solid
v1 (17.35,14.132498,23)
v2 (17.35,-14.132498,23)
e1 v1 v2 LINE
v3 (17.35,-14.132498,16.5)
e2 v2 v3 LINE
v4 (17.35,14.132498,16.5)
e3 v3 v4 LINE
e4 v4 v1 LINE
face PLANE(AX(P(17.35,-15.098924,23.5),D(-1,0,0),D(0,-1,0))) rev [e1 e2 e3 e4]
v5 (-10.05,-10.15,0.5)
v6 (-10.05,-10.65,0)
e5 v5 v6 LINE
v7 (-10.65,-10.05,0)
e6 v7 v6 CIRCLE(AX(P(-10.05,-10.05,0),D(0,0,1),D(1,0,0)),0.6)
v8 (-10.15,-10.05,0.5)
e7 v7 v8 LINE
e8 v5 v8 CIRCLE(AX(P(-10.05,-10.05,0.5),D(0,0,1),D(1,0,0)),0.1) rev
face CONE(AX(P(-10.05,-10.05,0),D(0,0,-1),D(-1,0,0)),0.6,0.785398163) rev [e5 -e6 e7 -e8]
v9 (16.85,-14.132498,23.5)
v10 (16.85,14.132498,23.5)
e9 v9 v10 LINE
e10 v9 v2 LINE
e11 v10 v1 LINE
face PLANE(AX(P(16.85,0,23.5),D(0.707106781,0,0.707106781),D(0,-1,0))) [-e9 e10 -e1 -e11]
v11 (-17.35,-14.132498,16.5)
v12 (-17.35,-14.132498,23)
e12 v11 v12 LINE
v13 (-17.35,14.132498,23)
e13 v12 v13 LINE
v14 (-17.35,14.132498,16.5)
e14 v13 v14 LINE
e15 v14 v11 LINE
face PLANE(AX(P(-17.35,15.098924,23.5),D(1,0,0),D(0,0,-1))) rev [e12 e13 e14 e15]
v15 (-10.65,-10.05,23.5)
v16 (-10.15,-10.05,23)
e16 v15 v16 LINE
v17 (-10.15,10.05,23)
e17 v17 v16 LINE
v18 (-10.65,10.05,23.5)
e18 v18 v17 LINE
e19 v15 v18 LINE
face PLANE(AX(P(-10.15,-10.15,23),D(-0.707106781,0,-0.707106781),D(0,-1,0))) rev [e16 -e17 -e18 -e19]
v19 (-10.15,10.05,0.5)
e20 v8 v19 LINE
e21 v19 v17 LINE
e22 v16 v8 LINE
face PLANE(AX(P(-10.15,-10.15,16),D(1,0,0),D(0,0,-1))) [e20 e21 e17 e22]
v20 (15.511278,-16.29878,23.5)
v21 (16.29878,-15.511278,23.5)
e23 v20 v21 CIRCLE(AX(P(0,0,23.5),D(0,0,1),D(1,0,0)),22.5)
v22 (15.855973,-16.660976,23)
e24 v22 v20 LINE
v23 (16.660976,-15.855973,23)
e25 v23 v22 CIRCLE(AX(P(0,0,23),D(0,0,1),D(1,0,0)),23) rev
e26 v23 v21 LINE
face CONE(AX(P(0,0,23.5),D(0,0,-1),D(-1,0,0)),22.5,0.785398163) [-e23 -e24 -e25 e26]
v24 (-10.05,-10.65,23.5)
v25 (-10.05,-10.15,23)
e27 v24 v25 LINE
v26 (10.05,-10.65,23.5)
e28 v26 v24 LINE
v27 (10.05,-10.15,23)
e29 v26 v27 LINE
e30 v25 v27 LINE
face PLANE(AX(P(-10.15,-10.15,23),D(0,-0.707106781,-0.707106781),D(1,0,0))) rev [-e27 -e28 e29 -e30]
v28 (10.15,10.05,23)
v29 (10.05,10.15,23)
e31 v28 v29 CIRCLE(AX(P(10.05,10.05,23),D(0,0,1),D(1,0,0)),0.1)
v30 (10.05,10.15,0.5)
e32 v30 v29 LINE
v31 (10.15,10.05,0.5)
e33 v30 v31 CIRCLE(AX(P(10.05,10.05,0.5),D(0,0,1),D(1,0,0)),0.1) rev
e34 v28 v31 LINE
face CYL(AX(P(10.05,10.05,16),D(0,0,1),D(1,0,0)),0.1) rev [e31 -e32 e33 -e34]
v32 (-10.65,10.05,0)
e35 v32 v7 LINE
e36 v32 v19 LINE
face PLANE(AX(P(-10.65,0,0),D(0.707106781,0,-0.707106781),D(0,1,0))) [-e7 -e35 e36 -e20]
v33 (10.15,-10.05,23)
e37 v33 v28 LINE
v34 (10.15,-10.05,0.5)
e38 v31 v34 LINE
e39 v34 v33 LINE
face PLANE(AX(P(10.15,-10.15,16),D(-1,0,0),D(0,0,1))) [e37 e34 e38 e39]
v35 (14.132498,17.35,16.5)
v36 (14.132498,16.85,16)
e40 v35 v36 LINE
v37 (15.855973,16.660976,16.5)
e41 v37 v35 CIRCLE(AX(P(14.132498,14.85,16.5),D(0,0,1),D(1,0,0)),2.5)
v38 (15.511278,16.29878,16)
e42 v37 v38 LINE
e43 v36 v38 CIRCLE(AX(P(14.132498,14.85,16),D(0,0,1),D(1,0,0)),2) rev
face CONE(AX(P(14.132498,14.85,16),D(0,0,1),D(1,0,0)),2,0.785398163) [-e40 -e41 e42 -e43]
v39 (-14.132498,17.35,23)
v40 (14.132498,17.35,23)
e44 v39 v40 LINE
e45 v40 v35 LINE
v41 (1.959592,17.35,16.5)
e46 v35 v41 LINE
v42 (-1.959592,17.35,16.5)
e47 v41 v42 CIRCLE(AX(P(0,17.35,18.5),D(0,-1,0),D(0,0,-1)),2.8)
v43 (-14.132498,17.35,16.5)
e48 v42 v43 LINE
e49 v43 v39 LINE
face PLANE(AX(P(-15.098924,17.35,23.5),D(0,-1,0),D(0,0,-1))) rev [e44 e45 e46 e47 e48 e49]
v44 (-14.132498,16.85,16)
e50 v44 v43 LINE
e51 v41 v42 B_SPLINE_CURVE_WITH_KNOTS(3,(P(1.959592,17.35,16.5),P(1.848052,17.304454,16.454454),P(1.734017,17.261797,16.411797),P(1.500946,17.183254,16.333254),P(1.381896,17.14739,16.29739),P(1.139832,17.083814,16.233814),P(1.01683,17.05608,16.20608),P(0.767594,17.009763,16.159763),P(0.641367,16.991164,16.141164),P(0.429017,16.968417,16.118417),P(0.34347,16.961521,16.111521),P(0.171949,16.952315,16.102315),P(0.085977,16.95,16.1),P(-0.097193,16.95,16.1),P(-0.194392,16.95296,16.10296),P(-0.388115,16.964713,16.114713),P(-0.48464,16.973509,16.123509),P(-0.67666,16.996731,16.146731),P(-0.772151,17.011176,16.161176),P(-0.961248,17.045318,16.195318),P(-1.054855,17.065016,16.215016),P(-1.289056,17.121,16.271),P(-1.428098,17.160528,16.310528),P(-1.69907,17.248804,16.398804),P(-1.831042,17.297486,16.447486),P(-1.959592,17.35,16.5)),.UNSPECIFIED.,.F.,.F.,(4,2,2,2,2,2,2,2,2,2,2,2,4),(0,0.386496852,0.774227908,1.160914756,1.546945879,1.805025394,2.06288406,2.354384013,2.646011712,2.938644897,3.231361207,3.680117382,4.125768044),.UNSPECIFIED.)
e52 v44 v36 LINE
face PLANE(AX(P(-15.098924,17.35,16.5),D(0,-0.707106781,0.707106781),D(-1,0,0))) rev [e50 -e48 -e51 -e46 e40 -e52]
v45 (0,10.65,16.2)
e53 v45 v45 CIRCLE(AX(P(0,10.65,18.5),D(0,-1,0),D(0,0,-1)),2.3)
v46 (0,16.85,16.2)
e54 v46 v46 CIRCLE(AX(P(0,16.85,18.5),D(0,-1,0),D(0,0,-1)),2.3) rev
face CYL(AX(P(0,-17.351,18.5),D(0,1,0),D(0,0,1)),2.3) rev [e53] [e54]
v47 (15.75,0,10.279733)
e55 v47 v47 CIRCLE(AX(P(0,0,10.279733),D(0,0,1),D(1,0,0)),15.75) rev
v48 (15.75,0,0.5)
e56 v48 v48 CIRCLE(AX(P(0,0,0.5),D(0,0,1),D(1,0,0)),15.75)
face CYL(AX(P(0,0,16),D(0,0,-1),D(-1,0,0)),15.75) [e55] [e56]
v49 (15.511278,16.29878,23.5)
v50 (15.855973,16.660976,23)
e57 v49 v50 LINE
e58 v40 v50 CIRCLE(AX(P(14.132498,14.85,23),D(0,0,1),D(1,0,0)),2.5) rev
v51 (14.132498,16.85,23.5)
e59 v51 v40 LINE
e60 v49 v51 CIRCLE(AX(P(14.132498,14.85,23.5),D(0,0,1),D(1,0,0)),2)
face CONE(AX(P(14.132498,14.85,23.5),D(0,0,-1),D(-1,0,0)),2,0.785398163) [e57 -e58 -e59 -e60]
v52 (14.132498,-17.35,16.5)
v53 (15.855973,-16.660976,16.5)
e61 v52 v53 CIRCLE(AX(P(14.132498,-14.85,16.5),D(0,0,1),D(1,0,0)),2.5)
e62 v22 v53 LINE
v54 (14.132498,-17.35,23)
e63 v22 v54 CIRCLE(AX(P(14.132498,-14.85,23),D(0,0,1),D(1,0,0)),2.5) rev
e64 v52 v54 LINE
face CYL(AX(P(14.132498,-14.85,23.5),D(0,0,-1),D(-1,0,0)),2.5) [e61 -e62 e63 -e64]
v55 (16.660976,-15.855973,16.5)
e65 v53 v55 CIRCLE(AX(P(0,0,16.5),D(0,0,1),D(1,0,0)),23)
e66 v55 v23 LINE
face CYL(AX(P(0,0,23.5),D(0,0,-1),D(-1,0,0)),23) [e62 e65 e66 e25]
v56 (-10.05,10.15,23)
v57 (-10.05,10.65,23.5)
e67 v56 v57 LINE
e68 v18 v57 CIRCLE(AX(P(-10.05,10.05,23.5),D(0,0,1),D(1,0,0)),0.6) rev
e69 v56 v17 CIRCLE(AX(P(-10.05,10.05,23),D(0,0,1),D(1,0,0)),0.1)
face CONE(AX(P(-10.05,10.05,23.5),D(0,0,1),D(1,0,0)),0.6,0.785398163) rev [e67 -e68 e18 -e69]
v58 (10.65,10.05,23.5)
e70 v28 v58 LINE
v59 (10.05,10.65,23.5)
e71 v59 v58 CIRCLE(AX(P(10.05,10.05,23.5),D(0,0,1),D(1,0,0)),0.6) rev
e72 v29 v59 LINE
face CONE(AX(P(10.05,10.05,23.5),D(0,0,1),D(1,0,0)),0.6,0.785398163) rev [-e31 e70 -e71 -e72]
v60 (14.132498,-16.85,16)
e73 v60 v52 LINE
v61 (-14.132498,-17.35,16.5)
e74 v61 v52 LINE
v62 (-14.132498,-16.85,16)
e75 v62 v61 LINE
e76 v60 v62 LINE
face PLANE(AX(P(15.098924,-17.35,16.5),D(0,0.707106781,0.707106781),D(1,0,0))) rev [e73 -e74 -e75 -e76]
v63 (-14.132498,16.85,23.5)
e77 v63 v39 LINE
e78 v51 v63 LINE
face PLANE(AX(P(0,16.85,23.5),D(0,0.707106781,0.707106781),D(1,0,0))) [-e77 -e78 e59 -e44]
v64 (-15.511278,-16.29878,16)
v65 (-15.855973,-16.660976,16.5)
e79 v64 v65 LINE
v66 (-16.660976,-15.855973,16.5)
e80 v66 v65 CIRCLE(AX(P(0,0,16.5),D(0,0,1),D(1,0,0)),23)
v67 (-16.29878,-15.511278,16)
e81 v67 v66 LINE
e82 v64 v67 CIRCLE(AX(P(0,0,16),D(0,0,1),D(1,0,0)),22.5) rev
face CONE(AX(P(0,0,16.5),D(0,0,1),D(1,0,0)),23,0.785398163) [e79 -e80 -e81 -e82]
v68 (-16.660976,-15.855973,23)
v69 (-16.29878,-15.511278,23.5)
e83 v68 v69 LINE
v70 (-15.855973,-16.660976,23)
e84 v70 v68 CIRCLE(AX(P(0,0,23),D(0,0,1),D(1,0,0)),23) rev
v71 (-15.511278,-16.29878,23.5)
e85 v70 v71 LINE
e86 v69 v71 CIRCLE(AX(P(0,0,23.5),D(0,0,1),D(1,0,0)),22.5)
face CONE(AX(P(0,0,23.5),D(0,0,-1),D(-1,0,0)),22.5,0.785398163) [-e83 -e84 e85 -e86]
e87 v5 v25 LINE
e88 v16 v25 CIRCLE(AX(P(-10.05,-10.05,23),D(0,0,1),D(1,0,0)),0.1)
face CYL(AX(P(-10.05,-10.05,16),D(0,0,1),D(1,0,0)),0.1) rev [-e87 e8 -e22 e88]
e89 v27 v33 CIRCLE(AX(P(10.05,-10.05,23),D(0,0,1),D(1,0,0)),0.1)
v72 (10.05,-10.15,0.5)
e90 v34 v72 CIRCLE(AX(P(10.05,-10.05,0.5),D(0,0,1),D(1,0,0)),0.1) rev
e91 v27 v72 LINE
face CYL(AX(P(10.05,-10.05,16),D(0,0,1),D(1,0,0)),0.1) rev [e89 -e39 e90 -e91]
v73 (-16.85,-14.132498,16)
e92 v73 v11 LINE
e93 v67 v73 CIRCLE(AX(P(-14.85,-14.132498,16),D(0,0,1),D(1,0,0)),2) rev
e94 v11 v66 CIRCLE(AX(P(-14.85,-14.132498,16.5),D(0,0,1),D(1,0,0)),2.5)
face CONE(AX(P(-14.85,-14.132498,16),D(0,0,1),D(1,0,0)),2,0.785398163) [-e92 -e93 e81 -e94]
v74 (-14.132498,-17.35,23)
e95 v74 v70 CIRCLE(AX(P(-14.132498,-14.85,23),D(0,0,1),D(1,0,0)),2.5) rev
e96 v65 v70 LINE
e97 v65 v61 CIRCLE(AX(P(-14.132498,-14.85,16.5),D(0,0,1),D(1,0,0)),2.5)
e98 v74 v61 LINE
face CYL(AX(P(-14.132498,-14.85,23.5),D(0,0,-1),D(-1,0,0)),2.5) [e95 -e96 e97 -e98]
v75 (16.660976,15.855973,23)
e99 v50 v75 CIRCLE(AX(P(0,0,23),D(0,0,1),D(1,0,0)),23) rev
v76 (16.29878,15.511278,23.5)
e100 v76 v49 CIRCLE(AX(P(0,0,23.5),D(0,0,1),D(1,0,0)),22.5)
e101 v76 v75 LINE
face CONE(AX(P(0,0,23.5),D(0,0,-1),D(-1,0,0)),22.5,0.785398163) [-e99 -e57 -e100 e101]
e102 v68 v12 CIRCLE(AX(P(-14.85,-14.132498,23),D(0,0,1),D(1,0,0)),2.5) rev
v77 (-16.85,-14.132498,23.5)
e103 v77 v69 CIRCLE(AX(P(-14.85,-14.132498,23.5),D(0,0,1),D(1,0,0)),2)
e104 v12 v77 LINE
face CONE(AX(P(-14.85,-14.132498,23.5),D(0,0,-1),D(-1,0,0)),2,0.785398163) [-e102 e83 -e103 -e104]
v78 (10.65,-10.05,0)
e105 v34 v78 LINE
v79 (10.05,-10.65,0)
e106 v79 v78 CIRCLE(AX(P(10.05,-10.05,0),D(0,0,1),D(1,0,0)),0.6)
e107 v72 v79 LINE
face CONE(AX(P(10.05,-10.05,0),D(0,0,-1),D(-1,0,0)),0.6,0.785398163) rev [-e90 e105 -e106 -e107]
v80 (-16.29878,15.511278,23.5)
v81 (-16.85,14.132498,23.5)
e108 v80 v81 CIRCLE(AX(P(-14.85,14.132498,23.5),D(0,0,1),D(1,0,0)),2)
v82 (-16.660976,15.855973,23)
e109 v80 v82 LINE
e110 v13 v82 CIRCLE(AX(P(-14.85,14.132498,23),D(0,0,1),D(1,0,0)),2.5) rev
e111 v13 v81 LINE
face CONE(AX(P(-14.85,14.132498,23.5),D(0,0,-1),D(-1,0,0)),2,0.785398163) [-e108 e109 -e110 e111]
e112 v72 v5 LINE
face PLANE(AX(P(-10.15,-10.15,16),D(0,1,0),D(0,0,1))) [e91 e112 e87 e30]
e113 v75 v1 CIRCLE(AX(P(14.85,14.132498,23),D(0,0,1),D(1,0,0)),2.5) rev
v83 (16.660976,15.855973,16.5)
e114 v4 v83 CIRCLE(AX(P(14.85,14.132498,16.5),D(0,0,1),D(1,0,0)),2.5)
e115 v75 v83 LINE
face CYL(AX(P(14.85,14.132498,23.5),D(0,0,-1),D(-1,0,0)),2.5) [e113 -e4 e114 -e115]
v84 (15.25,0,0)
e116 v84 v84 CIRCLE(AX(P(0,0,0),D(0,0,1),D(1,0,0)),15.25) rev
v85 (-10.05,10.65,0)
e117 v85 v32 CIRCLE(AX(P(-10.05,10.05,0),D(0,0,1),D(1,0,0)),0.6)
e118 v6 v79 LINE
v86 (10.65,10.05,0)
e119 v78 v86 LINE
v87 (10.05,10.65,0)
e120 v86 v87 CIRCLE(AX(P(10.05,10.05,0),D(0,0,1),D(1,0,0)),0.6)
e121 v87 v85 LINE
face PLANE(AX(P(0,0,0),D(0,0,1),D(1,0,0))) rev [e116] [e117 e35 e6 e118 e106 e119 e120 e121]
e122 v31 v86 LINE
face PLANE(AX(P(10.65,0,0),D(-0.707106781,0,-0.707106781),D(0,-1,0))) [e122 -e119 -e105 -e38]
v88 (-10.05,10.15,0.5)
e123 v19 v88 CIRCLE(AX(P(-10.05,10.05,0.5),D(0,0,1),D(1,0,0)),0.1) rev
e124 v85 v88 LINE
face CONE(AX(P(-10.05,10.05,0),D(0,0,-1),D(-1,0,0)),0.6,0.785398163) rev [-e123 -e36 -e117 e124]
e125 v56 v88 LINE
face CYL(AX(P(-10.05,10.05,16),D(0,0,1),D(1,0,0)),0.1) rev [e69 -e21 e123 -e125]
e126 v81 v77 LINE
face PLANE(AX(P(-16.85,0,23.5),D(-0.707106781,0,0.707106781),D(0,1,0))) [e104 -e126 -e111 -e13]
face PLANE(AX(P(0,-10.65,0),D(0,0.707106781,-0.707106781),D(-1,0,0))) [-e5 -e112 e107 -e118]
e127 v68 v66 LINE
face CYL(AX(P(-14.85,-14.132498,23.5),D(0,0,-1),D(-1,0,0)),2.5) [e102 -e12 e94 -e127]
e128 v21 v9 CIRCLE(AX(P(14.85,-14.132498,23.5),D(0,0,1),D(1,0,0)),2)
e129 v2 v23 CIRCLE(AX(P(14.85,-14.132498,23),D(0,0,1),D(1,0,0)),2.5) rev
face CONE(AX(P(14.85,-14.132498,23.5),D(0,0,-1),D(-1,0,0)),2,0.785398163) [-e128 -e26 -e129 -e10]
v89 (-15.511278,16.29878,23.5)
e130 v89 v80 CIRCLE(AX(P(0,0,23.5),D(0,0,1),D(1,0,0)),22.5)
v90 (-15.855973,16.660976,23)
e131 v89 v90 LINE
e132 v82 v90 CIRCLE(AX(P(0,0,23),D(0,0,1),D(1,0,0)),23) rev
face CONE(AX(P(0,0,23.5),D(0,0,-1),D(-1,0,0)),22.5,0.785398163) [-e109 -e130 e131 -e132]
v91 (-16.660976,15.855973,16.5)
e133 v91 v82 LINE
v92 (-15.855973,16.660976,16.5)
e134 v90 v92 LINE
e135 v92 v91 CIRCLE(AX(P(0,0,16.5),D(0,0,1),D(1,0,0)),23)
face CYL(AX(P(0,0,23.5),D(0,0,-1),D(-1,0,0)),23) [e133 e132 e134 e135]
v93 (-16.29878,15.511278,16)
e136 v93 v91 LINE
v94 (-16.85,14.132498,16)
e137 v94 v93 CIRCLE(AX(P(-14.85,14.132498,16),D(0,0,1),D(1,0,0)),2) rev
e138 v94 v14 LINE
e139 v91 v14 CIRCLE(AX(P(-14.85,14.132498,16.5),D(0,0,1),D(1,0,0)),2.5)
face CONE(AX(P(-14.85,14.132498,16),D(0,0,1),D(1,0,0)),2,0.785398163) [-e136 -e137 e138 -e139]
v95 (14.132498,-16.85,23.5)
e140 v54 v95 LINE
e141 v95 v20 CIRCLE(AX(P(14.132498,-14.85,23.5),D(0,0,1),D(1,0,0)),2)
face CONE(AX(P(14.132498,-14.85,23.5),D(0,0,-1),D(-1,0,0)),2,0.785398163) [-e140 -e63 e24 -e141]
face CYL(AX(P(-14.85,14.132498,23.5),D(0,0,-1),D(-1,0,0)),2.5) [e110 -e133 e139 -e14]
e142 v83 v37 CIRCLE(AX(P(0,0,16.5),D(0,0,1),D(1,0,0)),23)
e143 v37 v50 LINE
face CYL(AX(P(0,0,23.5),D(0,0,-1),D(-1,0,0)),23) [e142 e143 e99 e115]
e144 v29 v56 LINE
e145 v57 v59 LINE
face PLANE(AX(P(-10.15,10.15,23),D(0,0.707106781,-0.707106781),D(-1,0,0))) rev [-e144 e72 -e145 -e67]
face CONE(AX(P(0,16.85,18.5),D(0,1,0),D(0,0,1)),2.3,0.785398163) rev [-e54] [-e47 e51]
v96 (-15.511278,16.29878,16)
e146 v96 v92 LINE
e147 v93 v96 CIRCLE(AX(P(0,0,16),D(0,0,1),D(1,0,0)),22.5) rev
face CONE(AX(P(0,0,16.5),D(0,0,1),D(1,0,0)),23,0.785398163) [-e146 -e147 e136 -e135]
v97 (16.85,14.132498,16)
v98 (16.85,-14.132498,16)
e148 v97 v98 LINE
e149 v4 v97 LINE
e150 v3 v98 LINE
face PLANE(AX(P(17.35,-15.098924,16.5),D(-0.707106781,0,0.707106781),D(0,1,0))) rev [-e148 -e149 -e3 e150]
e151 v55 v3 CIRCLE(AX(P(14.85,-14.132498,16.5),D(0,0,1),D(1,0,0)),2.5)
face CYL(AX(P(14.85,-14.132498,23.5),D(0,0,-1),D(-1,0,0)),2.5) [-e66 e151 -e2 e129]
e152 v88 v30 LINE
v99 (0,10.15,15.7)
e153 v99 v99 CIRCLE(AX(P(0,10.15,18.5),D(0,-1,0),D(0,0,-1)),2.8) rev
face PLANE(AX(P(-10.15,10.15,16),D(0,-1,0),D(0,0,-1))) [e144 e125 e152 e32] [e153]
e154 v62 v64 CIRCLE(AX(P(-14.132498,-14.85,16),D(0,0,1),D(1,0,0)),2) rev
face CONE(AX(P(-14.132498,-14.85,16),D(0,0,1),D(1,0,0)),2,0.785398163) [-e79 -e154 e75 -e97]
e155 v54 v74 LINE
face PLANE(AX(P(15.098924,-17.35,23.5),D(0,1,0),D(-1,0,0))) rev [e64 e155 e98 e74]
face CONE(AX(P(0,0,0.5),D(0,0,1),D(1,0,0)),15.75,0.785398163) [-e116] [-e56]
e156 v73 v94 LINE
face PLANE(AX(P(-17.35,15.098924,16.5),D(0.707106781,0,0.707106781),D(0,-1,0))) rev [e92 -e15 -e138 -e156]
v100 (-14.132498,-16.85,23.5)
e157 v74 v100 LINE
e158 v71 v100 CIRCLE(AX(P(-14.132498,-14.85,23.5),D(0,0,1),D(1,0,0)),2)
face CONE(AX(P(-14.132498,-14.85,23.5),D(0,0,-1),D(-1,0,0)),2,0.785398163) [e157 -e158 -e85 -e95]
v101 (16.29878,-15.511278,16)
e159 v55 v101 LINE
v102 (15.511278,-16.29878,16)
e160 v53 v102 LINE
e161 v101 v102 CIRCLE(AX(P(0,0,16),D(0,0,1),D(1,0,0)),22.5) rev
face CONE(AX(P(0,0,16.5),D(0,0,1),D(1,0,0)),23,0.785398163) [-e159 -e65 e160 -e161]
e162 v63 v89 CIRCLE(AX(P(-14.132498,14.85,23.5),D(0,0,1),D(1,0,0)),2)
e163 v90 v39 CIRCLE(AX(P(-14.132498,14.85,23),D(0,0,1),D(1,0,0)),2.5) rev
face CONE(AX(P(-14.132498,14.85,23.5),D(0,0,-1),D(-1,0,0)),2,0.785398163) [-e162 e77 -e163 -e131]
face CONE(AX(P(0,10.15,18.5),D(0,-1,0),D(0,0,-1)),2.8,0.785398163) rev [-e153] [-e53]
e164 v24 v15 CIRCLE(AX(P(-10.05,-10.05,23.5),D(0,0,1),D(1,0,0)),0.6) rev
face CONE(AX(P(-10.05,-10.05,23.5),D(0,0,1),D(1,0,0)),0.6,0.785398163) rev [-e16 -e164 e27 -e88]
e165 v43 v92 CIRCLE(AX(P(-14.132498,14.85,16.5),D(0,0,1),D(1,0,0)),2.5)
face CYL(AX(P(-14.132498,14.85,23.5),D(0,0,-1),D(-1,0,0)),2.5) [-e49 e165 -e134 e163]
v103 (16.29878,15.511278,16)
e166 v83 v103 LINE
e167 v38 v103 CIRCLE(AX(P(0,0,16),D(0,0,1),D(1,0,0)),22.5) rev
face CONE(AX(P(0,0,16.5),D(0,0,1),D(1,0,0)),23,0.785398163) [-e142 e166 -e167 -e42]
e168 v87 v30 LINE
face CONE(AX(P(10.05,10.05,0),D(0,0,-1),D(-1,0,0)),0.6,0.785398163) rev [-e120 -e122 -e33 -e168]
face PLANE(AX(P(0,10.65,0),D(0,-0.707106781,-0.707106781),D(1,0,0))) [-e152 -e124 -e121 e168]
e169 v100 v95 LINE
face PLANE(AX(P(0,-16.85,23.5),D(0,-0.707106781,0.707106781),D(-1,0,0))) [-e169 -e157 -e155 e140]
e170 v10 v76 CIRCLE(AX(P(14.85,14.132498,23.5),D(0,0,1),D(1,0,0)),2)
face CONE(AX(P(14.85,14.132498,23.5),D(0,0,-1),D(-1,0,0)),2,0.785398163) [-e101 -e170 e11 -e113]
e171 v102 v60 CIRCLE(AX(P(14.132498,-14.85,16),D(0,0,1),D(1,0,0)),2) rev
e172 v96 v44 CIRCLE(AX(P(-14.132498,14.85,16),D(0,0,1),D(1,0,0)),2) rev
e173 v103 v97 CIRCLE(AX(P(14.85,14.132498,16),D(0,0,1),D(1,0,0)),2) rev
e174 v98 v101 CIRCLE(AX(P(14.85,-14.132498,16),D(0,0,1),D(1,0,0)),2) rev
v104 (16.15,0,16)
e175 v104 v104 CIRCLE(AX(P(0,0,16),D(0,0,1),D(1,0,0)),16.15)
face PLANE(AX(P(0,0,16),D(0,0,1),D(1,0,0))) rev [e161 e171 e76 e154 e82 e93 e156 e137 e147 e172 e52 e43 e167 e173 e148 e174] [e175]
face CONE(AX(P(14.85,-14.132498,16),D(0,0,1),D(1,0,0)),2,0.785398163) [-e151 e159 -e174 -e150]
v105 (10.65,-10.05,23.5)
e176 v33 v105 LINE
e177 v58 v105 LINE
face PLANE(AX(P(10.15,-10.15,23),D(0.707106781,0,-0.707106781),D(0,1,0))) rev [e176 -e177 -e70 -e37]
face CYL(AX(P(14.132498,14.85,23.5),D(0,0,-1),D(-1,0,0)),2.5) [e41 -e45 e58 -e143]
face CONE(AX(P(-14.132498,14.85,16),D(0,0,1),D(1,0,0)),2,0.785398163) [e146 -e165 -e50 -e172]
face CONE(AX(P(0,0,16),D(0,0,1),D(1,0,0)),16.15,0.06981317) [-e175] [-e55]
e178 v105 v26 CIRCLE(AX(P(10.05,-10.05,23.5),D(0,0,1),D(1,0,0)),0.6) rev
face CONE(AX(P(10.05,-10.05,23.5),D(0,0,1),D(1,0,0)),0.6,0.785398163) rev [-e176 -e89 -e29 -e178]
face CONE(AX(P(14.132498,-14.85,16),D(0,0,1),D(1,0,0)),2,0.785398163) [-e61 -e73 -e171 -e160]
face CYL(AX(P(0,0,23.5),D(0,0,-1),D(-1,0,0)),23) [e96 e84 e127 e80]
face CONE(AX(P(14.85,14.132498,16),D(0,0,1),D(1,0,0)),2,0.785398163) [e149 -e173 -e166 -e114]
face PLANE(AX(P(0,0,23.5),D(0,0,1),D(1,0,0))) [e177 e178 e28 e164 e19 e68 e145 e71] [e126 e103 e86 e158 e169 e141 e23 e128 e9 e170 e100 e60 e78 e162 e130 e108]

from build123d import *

# Parameters (mm, degrees)
SKIZZE1_R                       = 15.75
SKIZZE1_W                       = 20.3
SKIZZE1_H                       = 20.3
AUFSATZ_LINEAR_AUSTRAGEN1_DEPTH = 16
SKIZZE2_W                       = 20.3
SKIZZE2_H                       = 20.3
AUFSATZ_LINEAR_AUSTRAGEN2_DEPTH = 7.5
SCHNITT_LINEAR_AUSTRAGEN1_REACH = 47.358
SKIZZE3_R                       = 2.3
CHAMFER1_SIZE                   = 0.4
CHAMFER1_SIZE2                  = 5.720266503
VERRUNDUNG1_R                   = 0.1
VERRUNDUNG2_R                   = 2.5
FASE1_SIZE                      = 0.5
FASE4_SIZE                      = 0.5


with BuildPart() as part:
    # Skizze1 → Aufsatz-Linear austragen1 (new body)
    with BuildSketch(Plane.XY):
        Circle(SKIZZE1_R)
        Rectangle(SKIZZE1_W, SKIZZE1_H, mode=Mode.SUBTRACT)
    extrude(amount=AUFSATZ_LINEAR_AUSTRAGEN1_DEPTH)

    # Skizze2 → Aufsatz-Linear austragen2 (add)
    with BuildSketch(Plane.XY.offset(16)):
        with BuildLine():
            Line((-15.098923803, 17.35), (15.098923803, 17.35))
            ThreePointArc((15.098923803, 17.35), (16.263455967, 16.263455967), (17.35, 15.098923803))
            Line((17.35, 15.098923803), (17.35, -15.098923803))
            ThreePointArc((17.35, -15.098923803), (16.263455967, -16.263455967), (15.098923803, -17.35))
            Line((15.098923803, -17.35), (-15.098923803, -17.35))
            ThreePointArc((-15.098923803, -17.35), (-16.263455967, -16.263455967), (-17.35, -15.098923803))
            Line((-17.35, -15.098923803), (-17.35, 15.098923803))
            ThreePointArc((-17.35, 15.098923803), (-16.263455967, 16.263455967), (-15.098923803, 17.35))
        make_face()
        Rectangle(SKIZZE2_W, SKIZZE2_H, mode=Mode.SUBTRACT)
    extrude(amount=AUFSATZ_LINEAR_AUSTRAGEN2_DEPTH)

    # Skizze3 → Schnitt-Linear austragen1 (cut, up to next)
    with BuildSketch(Plane(origin=(0, 17.35, 0), x_dir=(1, 0, 0), z_dir=(0, 1, 0)), mode=Mode.PRIVATE) as schnitt_linear_austragen1_sk1:
        with Locations(Location((0, -18.5, 0), (0, 0, 270))):
            Circle(SKIZZE3_R)
    schnitt_linear_austragen1_tool1 = extrude(schnitt_linear_austragen1_sk1.sketch, amount=-SCHNITT_LINEAR_AUSTRAGEN1_REACH, mode=Mode.PRIVATE) & part.part
    add(schnitt_linear_austragen1_tool1.solids().sort_by_distance((0, 17.35, 18.5))[0], mode=Mode.SUBTRACT)

    # Chamfer1
    chamfer1_edges = [part.edges().sort_by_distance(p)[0] for p in [
        (-15.75, 0, 16),
    ]]
    chamfer1_side = [part.faces().sort_by_distance(p)[0] for p in [
        (-15.916455967, 15.916455967, 16),
    ]]
    chamfer(chamfer1_edges, length=CHAMFER1_SIZE, length2=CHAMFER1_SIZE2, reference=chamfer1_side[0])

    # Verrundung1
    verrundung1_edges = [part.edges().sort_by_distance(p)[0] for p in [
        (10.15, -10.15, 11.75),
        (10.15, 10.15, 11.75),
        (-10.15, 10.15, 11.75),
        (-10.15, -10.15, 11.75),
    ]]
    fillet(verrundung1_edges, radius=VERRUNDUNG1_R)

    # Verrundung2
    verrundung2_edges = [part.edges().sort_by_distance(p)[0] for p in [
        (-15.098923803, 17.35, 19.75),
        (-17.35, 15.098923803, 19.75),
        (-17.35, -15.098923803, 19.75),
        (-15.098923803, -17.35, 19.75),
        (15.098923803, -17.35, 19.75),
        (17.35, -15.098923803, 19.75),
        (17.35, 15.098923803, 19.75),
        (15.098923803, 17.35, 19.75),
    ]]
    fillet(verrundung2_edges, radius=VERRUNDUNG2_R)

    # Fase1
    # the kernel refuses this chamfer: 0.5 mm, written as the material it takes off along each edge
    with BuildSketch(Plane(origin=(-17.35, -14.13249801, 23.5), x_dir=(0.9996219169112968, 0, 0.027495876610589005), z_dir=(0, 1, 0)), Plane(origin=(14.13249801, -17.35, 23.5), x_dir=(0, 0.9996219169112968, 0.027495876610589005), z_dir=(-1, 0, 0)), Plane(origin=(17.35, 14.13249801, 23.5), x_dir=(-0.9996219169112968, 0, 0.027495876610589005), z_dir=(0, -1, 0)), Plane(origin=(-14.13249801, 17.35, 23.5), x_dir=(0, -0.9996219169112968, 0.027495876610589005), z_dir=(1, 0, 0))) as fase1_piece_1:
        Polygon((FASE1_SIZE * 0.999621916911, FASE1_SIZE * 0.0274958766106), (-FASE1_SIZE * 0.0274958766106, FASE1_SIZE * 0.999621916911), (0, 0), align=None)
    extrude(amount=28.26499602, mode=Mode.SUBTRACT)
    with BuildSketch(Plane(origin=(0, 0, 23.5), x_dir=(-0.7243902439024396, 0.6893901468246876, 0), z_dir=(-0.6893901468246876, -0.7243902439024396, 0))) as fase1_piece_2:
        Polygon((23 - FASE1_SIZE, 0), (23, FASE1_SIZE), (23, 0), align=None)
    revolve(axis=Axis((0, 0, 23.5), (0, 0, -1)), revolution_arc=2.836293852, mode=Mode.SUBTRACT)
    with BuildSketch(Plane(origin=(0, 0, 23.5), x_dir=(0.7243902439024391, -0.6893901468246878, 0), z_dir=(0.6893901468246878, 0.7243902439024391, 0))) as fase1_piece_3:
        Polygon((23 - FASE1_SIZE, 0), (23, FASE1_SIZE), (23, 0), align=None)
    revolve(axis=Axis((0, 0, 23.5), (0, 0, -1)), revolution_arc=2.836293852, mode=Mode.SUBTRACT)
    with BuildSketch(Plane(origin=(0, 0, 23.5), x_dir=(0.689390146824687, 0.7243902439024399, 0), z_dir=(-0.7243902439024399, 0.689390146824687, 0))) as fase1_piece_4:
        Polygon((23 - FASE1_SIZE, 0), (23, FASE1_SIZE), (23, 0), align=None)
    revolve(axis=Axis((0, 0, 23.5), (0, 0, -1)), revolution_arc=2.836293852, mode=Mode.SUBTRACT)
    with BuildSketch(Plane(origin=(-14.13249801, 14.85, 23.5), x_dir=(-0.689390146824687, 0.72439024390244, 0), z_dir=(-0.72439024390244, -0.689390146824687, 0))) as fase1_piece_5:
        Polygon((2.5 - FASE1_SIZE, 0), (2.5, FASE1_SIZE), (2.5, 0), align=None)
    revolve(axis=Axis((-14.13249801, 14.85, 23.5), (0, 0, -1)), revolution_arc=43.581853074, mode=Mode.SUBTRACT)
    with BuildSketch(Plane(origin=(-14.85, 14.13249801, 23.5), x_dir=(-0.7243902439024396, 0.6893901468246874, 0), z_dir=(0.6893901468246874, 0.7243902439024396, 0))) as fase1_piece_6:
        Polygon((2.5 - FASE1_SIZE, 0), (2.5, -FASE1_SIZE), (2.5, 0), align=None)
    revolve(axis=Axis((-14.85, 14.13249801, 23.5), (0, 0, 1)), revolution_arc=43.581853074, mode=Mode.SUBTRACT)
    with BuildSketch(Plane(origin=(14.13249801, 14.85, 23.5), x_dir=(0, 1, 0), z_dir=(-1, 0, 0))) as fase1_piece_7:
        Polygon((2.5 - FASE1_SIZE, 0), (2.5, FASE1_SIZE), (2.5, 0), align=None)
    revolve(axis=Axis((14.13249801, 14.85, 23.5), (0, 0, -1)), revolution_arc=43.581853074, mode=Mode.SUBTRACT)
    with BuildSketch(Plane(origin=(14.85, 14.13249801, 23.5), x_dir=(0.72439024390244, 0.689390146824687, 0), z_dir=(-0.689390146824687, 0.72439024390244, 0))) as fase1_piece_8:
        Polygon((2.5 - FASE1_SIZE, 0), (2.5, FASE1_SIZE), (2.5, 0), align=None)
    revolve(axis=Axis((14.85, 14.13249801, 23.5), (0, 0, -1)), revolution_arc=43.581853074, mode=Mode.SUBTRACT)
    with BuildSketch(Plane(origin=(14.85, -14.13249801, 23.5), x_dir=(1, 0, 0), z_dir=(0, 1, 0))) as fase1_piece_9:
        Polygon((2.5 - FASE1_SIZE, 0), (2.5, FASE1_SIZE), (2.5, 0), align=None)
    revolve(axis=Axis((14.85, -14.13249801, 23.5), (0, 0, -1)), revolution_arc=43.581853074, mode=Mode.SUBTRACT)
    with BuildSketch(Plane(origin=(14.13249801, -14.85, 23.5), x_dir=(0.6893901468246885, -0.7243902439024386, 0), z_dir=(0.7243902439024386, 0.6893901468246885, 0))) as fase1_piece_10:
        Polygon((2.5 - FASE1_SIZE, 0), (2.5, FASE1_SIZE), (2.5, 0), align=None)
    revolve(axis=Axis((14.13249801, -14.85, 23.5), (0, 0, -1)), revolution_arc=43.581853074, mode=Mode.SUBTRACT)
    with BuildSketch(Plane(origin=(-14.13249801, -14.85, 23.5), x_dir=(0, -1, 0), z_dir=(1, 0, 0))) as fase1_piece_11:
        Polygon((2.5 - FASE1_SIZE, 0), (2.5, FASE1_SIZE), (2.5, 0), align=None)
    revolve(axis=Axis((-14.13249801, -14.85, 23.5), (0, 0, -1)), revolution_arc=43.581853074, mode=Mode.SUBTRACT)
    with BuildSketch(Plane(origin=(-14.85, -14.13249801, 23.5), x_dir=(-0.7243902439024386, -0.6893901468246885, 0), z_dir=(0.6893901468246885, -0.7243902439024386, 0))) as fase1_piece_12:
        Polygon((2.5 - FASE1_SIZE, 0), (2.5, FASE1_SIZE), (2.5, 0), align=None)
    revolve(axis=Axis((-14.85, -14.13249801, 23.5), (0, 0, -1)), revolution_arc=43.581853074, mode=Mode.SUBTRACT)
    with BuildSketch(Plane(origin=(0, 0, 0), x_dir=(1, 0, 0), z_dir=(0, -1, 0))) as fase1_piece_13:
        Polygon((15.75 - FASE1_SIZE, 0), (15.75, FASE1_SIZE), (15.75, 0), align=None)
    revolve(axis=Axis((0, 0, 0), (0, 0, 1)), mode=Mode.SUBTRACT)
    with BuildSketch(Plane(origin=(0, 10.15, 18.5), x_dir=(0, 0, 1), z_dir=(-1, 0, 0))) as fase1_piece_14:
        Polygon((2.3 + FASE1_SIZE, 0), (2.3, FASE1_SIZE), (2.3, 0), align=None)
    revolve(axis=Axis((0, 10.15, 18.5), (0, 1, 0)), mode=Mode.SUBTRACT)
    with BuildSketch(Plane(origin=(0, 17.35, 18.5), x_dir=(0, 0, 1), z_dir=(-1, 0, 0))) as fase1_piece_15:
        Polygon((2.3 + FASE1_SIZE, 0), (2.3, -FASE1_SIZE), (2.3, 0), align=None)
    revolve(axis=Axis((0, 17.35, 18.5), (0, 1, 0)), mode=Mode.SUBTRACT)
    with BuildSketch(Plane(origin=(-10.05, -10.15, 0), x_dir=(0, 0.02749587661058563, 0.9996219169112968), z_dir=(1, 0, 0)), Plane(origin=(-10.05, -10.15, 23.5), x_dir=(0, -0.9996219169112968, 0.0274958766105891), z_dir=(1, 0, 0)), Plane(origin=(10.15, -10.05, 0), x_dir=(-0.02749587661058563, 0, 0.9996219169112968), z_dir=(0, 1, 0)), Plane(origin=(10.15, -10.05, 23.5), x_dir=(0.9996219169112968, 0, 0.0274958766105891), z_dir=(0, 1, 0)), Plane(origin=(-10.15, 10.05, 0), x_dir=(0.02749587661058563, 0, 0.9996219169112968), z_dir=(0, -1, 0)), Plane(origin=(-10.15, 10.05, 23.5), x_dir=(-0.9996219169112968, 0, 0.0274958766105891), z_dir=(0, -1, 0)), Plane(origin=(10.05, 10.15, 0), x_dir=(0, -0.02749587661058563, 0.9996219169112968), z_dir=(-1, 0, 0)), Plane(origin=(10.05, 10.15, 23.5), x_dir=(0, 0.9996219169112968, 0.0274958766105891), z_dir=(-1, 0, 0))) as fase1_piece_16:
        Polygon((FASE1_SIZE * 0.999621916911, FASE1_SIZE * 0.0274958766106), (-FASE1_SIZE * 0.0274958766106, FASE1_SIZE * 0.999621916911), (0, 0), align=None)
    extrude(amount=20.1, mode=Mode.SUBTRACT)
    with BuildSketch(Plane(origin=(10.05, -10.05, 0), x_dir=(1, 0, 0), z_dir=(0, 1, 0))) as fase1_piece_17:
        Polygon((0.1, -FASE1_SIZE), (0.1 + FASE1_SIZE, 0), (0.1, 0), align=None)
    revolve(axis=Axis((10.05, -10.05, 0), (0, 0, -1)), revolution_arc=90, mode=Mode.SUBTRACT)
    with BuildSketch(Plane(origin=(10.05, -10.05, 23.5), x_dir=(1, 0, 0), z_dir=(0, 1, 0))) as fase1_piece_18:
        Polygon((0.1 + FASE1_SIZE, 0), (0.1, FASE1_SIZE), (0.1, 0), align=None)
    revolve(axis=Axis((10.05, -10.05, 23.5), (0, 0, -1)), revolution_arc=90, mode=Mode.SUBTRACT)
    with BuildSketch(Plane(origin=(-10.05, -10.05, 0), x_dir=(-1, 0, 0), z_dir=(0, 1, 0))) as fase1_piece_19:
        Polygon((0.1, FASE1_SIZE), (0.1 + FASE1_SIZE, 0), (0.1, 0), align=None)
    revolve(axis=Axis((-10.05, -10.05, 0), (0, 0, 1)), revolution_arc=90, mode=Mode.SUBTRACT)
    with BuildSketch(Plane(origin=(-10.05, -10.05, 23.5), x_dir=(-1, 0, 0), z_dir=(0, 1, 0))) as fase1_piece_20:
        Polygon((0.1 + FASE1_SIZE, 0), (0.1, -FASE1_SIZE), (0.1, 0), align=None)
    revolve(axis=Axis((-10.05, -10.05, 23.5), (0, 0, 1)), revolution_arc=90, mode=Mode.SUBTRACT)
    with BuildSketch(Plane(origin=(-10.05, 10.05, 0), x_dir=(-1, 0, 0), z_dir=(0, -1, 0))) as fase1_piece_21:
        Polygon((0.1, -FASE1_SIZE), (0.1 + FASE1_SIZE, 0), (0.1, 0), align=None)
    revolve(axis=Axis((-10.05, 10.05, 0), (0, 0, -1)), revolution_arc=90, mode=Mode.SUBTRACT)
    with BuildSketch(Plane(origin=(-10.05, 10.05, 23.5), x_dir=(-1, 0, 0), z_dir=(0, -1, 0))) as fase1_piece_22:
        Polygon((0.1 + FASE1_SIZE, 0), (0.1, FASE1_SIZE), (0.1, 0), align=None)
    revolve(axis=Axis((-10.05, 10.05, 23.5), (0, 0, -1)), revolution_arc=90, mode=Mode.SUBTRACT)
    with BuildSketch(Plane(origin=(10.05, 10.05, 0), x_dir=(0, 1, 0), z_dir=(-1, 0, 0))) as fase1_piece_23:
        Polygon((0.1, -FASE1_SIZE), (0.1 + FASE1_SIZE, 0), (0.1, 0), align=None)
    revolve(axis=Axis((10.05, 10.05, 0), (0, 0, -1)), revolution_arc=90, mode=Mode.SUBTRACT)
    with BuildSketch(Plane(origin=(10.05, 10.05, 23.5), x_dir=(0, 1, 0), z_dir=(-1, 0, 0))) as fase1_piece_24:
        Polygon((0.1 + FASE1_SIZE, 0), (0.1, FASE1_SIZE), (0.1, 0), align=None)
    revolve(axis=Axis((10.05, 10.05, 23.5), (0, 0, -1)), revolution_arc=90, mode=Mode.SUBTRACT)
    with BuildSketch(Plane(origin=(0, 0, 23.5), x_dir=(-0.6893901468246829, -0.7243902439024439, 0), z_dir=(0.7243902439024439, -0.6893901468246829, 0))) as fase1_piece_25:
        Polygon((23 - FASE1_SIZE, 0), (23, FASE1_SIZE), (23, 0), align=None)
    revolve(axis=Axis((0, 0, 23.5), (0, 0, -1)), revolution_arc=2.836293852, mode=Mode.SUBTRACT)

    # Fase4
    # the kernel refuses this chamfer: 0.5 mm, written as the material it takes off along each edge
    with BuildSketch(Plane(origin=(14.13249801, -17.35, 16), x_dir=(0, -0.027495876610589005, 0.9996219169112968), z_dir=(-1, 0, 0)), Plane(origin=(17.35, 14.13249801, 16), x_dir=(0.027495876610589005, 0, 0.9996219169112968), z_dir=(0, -1, 0)), Plane(origin=(-17.35, -14.13249801, 16), x_dir=(-0.027495876610589005, 0, 0.9996219169112968), z_dir=(0, 1, 0))) as fase4_piece_1:
        Polygon((FASE4_SIZE * 0.999621916911, FASE4_SIZE * 0.0274958766106), (-FASE4_SIZE * 0.0274958766106, FASE4_SIZE * 0.999621916911), (0, 0), align=None)
    extrude(amount=28.26499602, mode=Mode.SUBTRACT)
    with BuildSketch(Plane(origin=(14.13249801, -14.85, 16), x_dir=(0.6893901468246885, -0.7243902439024386, 0), z_dir=(0.7243902439024386, 0.6893901468246885, 0))) as fase4_piece_2:
        Polygon((2.5, -FASE4_SIZE), (2.5 - FASE4_SIZE, 0), (2.5, 0), align=None)
    revolve(axis=Axis((14.13249801, -14.85, 16), (0, 0, -1)), revolution_arc=43.581853074, mode=Mode.SUBTRACT)
    with BuildSketch(Plane(origin=(-14.13249801, -14.85, 16), x_dir=(0, -1, 0), z_dir=(1, 0, 0))) as fase4_piece_3:
        Polygon((2.5, -FASE4_SIZE), (2.5 - FASE4_SIZE, 0), (2.5, 0), align=None)
    revolve(axis=Axis((-14.13249801, -14.85, 16), (0, 0, -1)), revolution_arc=43.581853074, mode=Mode.SUBTRACT)
    with BuildSketch(Plane(origin=(0, 0, 16), x_dir=(0.7243902439024391, -0.6893901468246878, 0), z_dir=(0.6893901468246878, 0.7243902439024391, 0))) as fase4_piece_4:
        Polygon((23, -FASE4_SIZE), (23 - FASE4_SIZE, 0), (23, 0), align=None)
    revolve(axis=Axis((0, 0, 16), (0, 0, -1)), revolution_arc=2.836293852, mode=Mode.SUBTRACT)
    with BuildSketch(Plane(origin=(0, 0, 16), x_dir=(-0.6893901468246829, -0.7243902439024439, 0), z_dir=(0.7243902439024439, -0.6893901468246829, 0))) as fase4_piece_5:
        Polygon((23, -FASE4_SIZE), (23 - FASE4_SIZE, 0), (23, 0), align=None)
    revolve(axis=Axis((0, 0, 16), (0, 0, -1)), revolution_arc=2.836293852, mode=Mode.SUBTRACT)
    with BuildSketch(Plane(origin=(14.85, -14.13249801, 16), x_dir=(1, 0, 0), z_dir=(0, 1, 0))) as fase4_piece_6:
        Polygon((2.5, -FASE4_SIZE), (2.5 - FASE4_SIZE, 0), (2.5, 0), align=None)
    revolve(axis=Axis((14.85, -14.13249801, 16), (0, 0, -1)), revolution_arc=43.581853074, mode=Mode.SUBTRACT)
    with BuildSketch(Plane(origin=(-14.85, -14.13249801, 16), x_dir=(-0.7243902439024386, -0.6893901468246885, 0), z_dir=(0.6893901468246885, -0.7243902439024386, 0))) as fase4_piece_7:
        Polygon((2.5, -FASE4_SIZE), (2.5 - FASE4_SIZE, 0), (2.5, 0), align=None)
    revolve(axis=Axis((-14.85, -14.13249801, 16), (0, 0, -1)), revolution_arc=43.581853074, mode=Mode.SUBTRACT)
    with BuildSketch(Plane(origin=(14.85, 14.13249801, 16), x_dir=(0.72439024390244, 0.689390146824687, 0), z_dir=(-0.689390146824687, 0.72439024390244, 0))) as fase4_piece_8:
        Polygon((2.5, -FASE4_SIZE), (2.5 - FASE4_SIZE, 0), (2.5, 0), align=None)
    revolve(axis=Axis((14.85, 14.13249801, 16), (0, 0, -1)), revolution_arc=43.581853074, mode=Mode.SUBTRACT)
    with BuildSketch(Plane(origin=(-14.85, 14.13249801, 16), x_dir=(-0.7243902439024396, 0.6893901468246874, 0), z_dir=(0.6893901468246874, 0.7243902439024396, 0))) as fase4_piece_9:
        Polygon((2.5, FASE4_SIZE), (2.5 - FASE4_SIZE, 0), (2.5, 0), align=None)
    revolve(axis=Axis((-14.85, 14.13249801, 16), (0, 0, 1)), revolution_arc=43.581853074, mode=Mode.SUBTRACT)
    with BuildSketch(Plane(origin=(0, 0, 16), x_dir=(0.689390146824687, 0.7243902439024399, 0), z_dir=(-0.7243902439024399, 0.689390146824687, 0))) as fase4_piece_10:
        Polygon((23, -FASE4_SIZE), (23 - FASE4_SIZE, 0), (23, 0), align=None)
    revolve(axis=Axis((0, 0, 16), (0, 0, -1)), revolution_arc=2.836293852, mode=Mode.SUBTRACT)
    with BuildSketch(Plane(origin=(0, 0, 16), x_dir=(-0.7243902439024396, 0.6893901468246876, 0), z_dir=(-0.6893901468246876, -0.7243902439024396, 0))) as fase4_piece_11:
        Polygon((23, -FASE4_SIZE), (23 - FASE4_SIZE, 0), (23, 0), align=None)
    revolve(axis=Axis((0, 0, 16), (0, 0, -1)), revolution_arc=2.836293852, mode=Mode.SUBTRACT)
    with BuildSketch(Plane(origin=(14.13249801, 14.85, 16), x_dir=(0, 1, 0), z_dir=(-1, 0, 0))) as fase4_piece_12:
        Polygon((2.5, -FASE4_SIZE), (2.5 - FASE4_SIZE, 0), (2.5, 0), align=None)
    revolve(axis=Axis((14.13249801, 14.85, 16), (0, 0, -1)), revolution_arc=43.581853074, mode=Mode.SUBTRACT)
    with BuildSketch(Plane(origin=(-14.13249801, 14.85, 16), x_dir=(-0.689390146824687, 0.72439024390244, 0), z_dir=(-0.72439024390244, -0.689390146824687, 0))) as fase4_piece_13:
        Polygon((2.5, -FASE4_SIZE), (2.5 - FASE4_SIZE, 0), (2.5, 0), align=None)
    revolve(axis=Axis((-14.13249801, 14.85, 16), (0, 0, -1)), revolution_arc=43.581853074, mode=Mode.SUBTRACT)
    with BuildSketch(Plane(origin=(-0.024889473, 17.35, 16), x_dir=(0, 0.027495876610589005, 0.9996219169112968), z_dir=(1, 0, 0)), Plane(origin=(-14.13249801, 17.35, 16), x_dir=(0, 0.027495876610589005, 0.9996219169112968), z_dir=(1, 0, 0))) as fase4_piece_14:
        Polygon((FASE4_SIZE * 0.999621916911, FASE4_SIZE * 0.0274958766106), (-FASE4_SIZE * 0.0274958766106, FASE4_SIZE * 0.999621916911), (0, 0), align=None)
    extrude(amount=14.157387483, mode=Mode.SUBTRACT)


solid = part.part
